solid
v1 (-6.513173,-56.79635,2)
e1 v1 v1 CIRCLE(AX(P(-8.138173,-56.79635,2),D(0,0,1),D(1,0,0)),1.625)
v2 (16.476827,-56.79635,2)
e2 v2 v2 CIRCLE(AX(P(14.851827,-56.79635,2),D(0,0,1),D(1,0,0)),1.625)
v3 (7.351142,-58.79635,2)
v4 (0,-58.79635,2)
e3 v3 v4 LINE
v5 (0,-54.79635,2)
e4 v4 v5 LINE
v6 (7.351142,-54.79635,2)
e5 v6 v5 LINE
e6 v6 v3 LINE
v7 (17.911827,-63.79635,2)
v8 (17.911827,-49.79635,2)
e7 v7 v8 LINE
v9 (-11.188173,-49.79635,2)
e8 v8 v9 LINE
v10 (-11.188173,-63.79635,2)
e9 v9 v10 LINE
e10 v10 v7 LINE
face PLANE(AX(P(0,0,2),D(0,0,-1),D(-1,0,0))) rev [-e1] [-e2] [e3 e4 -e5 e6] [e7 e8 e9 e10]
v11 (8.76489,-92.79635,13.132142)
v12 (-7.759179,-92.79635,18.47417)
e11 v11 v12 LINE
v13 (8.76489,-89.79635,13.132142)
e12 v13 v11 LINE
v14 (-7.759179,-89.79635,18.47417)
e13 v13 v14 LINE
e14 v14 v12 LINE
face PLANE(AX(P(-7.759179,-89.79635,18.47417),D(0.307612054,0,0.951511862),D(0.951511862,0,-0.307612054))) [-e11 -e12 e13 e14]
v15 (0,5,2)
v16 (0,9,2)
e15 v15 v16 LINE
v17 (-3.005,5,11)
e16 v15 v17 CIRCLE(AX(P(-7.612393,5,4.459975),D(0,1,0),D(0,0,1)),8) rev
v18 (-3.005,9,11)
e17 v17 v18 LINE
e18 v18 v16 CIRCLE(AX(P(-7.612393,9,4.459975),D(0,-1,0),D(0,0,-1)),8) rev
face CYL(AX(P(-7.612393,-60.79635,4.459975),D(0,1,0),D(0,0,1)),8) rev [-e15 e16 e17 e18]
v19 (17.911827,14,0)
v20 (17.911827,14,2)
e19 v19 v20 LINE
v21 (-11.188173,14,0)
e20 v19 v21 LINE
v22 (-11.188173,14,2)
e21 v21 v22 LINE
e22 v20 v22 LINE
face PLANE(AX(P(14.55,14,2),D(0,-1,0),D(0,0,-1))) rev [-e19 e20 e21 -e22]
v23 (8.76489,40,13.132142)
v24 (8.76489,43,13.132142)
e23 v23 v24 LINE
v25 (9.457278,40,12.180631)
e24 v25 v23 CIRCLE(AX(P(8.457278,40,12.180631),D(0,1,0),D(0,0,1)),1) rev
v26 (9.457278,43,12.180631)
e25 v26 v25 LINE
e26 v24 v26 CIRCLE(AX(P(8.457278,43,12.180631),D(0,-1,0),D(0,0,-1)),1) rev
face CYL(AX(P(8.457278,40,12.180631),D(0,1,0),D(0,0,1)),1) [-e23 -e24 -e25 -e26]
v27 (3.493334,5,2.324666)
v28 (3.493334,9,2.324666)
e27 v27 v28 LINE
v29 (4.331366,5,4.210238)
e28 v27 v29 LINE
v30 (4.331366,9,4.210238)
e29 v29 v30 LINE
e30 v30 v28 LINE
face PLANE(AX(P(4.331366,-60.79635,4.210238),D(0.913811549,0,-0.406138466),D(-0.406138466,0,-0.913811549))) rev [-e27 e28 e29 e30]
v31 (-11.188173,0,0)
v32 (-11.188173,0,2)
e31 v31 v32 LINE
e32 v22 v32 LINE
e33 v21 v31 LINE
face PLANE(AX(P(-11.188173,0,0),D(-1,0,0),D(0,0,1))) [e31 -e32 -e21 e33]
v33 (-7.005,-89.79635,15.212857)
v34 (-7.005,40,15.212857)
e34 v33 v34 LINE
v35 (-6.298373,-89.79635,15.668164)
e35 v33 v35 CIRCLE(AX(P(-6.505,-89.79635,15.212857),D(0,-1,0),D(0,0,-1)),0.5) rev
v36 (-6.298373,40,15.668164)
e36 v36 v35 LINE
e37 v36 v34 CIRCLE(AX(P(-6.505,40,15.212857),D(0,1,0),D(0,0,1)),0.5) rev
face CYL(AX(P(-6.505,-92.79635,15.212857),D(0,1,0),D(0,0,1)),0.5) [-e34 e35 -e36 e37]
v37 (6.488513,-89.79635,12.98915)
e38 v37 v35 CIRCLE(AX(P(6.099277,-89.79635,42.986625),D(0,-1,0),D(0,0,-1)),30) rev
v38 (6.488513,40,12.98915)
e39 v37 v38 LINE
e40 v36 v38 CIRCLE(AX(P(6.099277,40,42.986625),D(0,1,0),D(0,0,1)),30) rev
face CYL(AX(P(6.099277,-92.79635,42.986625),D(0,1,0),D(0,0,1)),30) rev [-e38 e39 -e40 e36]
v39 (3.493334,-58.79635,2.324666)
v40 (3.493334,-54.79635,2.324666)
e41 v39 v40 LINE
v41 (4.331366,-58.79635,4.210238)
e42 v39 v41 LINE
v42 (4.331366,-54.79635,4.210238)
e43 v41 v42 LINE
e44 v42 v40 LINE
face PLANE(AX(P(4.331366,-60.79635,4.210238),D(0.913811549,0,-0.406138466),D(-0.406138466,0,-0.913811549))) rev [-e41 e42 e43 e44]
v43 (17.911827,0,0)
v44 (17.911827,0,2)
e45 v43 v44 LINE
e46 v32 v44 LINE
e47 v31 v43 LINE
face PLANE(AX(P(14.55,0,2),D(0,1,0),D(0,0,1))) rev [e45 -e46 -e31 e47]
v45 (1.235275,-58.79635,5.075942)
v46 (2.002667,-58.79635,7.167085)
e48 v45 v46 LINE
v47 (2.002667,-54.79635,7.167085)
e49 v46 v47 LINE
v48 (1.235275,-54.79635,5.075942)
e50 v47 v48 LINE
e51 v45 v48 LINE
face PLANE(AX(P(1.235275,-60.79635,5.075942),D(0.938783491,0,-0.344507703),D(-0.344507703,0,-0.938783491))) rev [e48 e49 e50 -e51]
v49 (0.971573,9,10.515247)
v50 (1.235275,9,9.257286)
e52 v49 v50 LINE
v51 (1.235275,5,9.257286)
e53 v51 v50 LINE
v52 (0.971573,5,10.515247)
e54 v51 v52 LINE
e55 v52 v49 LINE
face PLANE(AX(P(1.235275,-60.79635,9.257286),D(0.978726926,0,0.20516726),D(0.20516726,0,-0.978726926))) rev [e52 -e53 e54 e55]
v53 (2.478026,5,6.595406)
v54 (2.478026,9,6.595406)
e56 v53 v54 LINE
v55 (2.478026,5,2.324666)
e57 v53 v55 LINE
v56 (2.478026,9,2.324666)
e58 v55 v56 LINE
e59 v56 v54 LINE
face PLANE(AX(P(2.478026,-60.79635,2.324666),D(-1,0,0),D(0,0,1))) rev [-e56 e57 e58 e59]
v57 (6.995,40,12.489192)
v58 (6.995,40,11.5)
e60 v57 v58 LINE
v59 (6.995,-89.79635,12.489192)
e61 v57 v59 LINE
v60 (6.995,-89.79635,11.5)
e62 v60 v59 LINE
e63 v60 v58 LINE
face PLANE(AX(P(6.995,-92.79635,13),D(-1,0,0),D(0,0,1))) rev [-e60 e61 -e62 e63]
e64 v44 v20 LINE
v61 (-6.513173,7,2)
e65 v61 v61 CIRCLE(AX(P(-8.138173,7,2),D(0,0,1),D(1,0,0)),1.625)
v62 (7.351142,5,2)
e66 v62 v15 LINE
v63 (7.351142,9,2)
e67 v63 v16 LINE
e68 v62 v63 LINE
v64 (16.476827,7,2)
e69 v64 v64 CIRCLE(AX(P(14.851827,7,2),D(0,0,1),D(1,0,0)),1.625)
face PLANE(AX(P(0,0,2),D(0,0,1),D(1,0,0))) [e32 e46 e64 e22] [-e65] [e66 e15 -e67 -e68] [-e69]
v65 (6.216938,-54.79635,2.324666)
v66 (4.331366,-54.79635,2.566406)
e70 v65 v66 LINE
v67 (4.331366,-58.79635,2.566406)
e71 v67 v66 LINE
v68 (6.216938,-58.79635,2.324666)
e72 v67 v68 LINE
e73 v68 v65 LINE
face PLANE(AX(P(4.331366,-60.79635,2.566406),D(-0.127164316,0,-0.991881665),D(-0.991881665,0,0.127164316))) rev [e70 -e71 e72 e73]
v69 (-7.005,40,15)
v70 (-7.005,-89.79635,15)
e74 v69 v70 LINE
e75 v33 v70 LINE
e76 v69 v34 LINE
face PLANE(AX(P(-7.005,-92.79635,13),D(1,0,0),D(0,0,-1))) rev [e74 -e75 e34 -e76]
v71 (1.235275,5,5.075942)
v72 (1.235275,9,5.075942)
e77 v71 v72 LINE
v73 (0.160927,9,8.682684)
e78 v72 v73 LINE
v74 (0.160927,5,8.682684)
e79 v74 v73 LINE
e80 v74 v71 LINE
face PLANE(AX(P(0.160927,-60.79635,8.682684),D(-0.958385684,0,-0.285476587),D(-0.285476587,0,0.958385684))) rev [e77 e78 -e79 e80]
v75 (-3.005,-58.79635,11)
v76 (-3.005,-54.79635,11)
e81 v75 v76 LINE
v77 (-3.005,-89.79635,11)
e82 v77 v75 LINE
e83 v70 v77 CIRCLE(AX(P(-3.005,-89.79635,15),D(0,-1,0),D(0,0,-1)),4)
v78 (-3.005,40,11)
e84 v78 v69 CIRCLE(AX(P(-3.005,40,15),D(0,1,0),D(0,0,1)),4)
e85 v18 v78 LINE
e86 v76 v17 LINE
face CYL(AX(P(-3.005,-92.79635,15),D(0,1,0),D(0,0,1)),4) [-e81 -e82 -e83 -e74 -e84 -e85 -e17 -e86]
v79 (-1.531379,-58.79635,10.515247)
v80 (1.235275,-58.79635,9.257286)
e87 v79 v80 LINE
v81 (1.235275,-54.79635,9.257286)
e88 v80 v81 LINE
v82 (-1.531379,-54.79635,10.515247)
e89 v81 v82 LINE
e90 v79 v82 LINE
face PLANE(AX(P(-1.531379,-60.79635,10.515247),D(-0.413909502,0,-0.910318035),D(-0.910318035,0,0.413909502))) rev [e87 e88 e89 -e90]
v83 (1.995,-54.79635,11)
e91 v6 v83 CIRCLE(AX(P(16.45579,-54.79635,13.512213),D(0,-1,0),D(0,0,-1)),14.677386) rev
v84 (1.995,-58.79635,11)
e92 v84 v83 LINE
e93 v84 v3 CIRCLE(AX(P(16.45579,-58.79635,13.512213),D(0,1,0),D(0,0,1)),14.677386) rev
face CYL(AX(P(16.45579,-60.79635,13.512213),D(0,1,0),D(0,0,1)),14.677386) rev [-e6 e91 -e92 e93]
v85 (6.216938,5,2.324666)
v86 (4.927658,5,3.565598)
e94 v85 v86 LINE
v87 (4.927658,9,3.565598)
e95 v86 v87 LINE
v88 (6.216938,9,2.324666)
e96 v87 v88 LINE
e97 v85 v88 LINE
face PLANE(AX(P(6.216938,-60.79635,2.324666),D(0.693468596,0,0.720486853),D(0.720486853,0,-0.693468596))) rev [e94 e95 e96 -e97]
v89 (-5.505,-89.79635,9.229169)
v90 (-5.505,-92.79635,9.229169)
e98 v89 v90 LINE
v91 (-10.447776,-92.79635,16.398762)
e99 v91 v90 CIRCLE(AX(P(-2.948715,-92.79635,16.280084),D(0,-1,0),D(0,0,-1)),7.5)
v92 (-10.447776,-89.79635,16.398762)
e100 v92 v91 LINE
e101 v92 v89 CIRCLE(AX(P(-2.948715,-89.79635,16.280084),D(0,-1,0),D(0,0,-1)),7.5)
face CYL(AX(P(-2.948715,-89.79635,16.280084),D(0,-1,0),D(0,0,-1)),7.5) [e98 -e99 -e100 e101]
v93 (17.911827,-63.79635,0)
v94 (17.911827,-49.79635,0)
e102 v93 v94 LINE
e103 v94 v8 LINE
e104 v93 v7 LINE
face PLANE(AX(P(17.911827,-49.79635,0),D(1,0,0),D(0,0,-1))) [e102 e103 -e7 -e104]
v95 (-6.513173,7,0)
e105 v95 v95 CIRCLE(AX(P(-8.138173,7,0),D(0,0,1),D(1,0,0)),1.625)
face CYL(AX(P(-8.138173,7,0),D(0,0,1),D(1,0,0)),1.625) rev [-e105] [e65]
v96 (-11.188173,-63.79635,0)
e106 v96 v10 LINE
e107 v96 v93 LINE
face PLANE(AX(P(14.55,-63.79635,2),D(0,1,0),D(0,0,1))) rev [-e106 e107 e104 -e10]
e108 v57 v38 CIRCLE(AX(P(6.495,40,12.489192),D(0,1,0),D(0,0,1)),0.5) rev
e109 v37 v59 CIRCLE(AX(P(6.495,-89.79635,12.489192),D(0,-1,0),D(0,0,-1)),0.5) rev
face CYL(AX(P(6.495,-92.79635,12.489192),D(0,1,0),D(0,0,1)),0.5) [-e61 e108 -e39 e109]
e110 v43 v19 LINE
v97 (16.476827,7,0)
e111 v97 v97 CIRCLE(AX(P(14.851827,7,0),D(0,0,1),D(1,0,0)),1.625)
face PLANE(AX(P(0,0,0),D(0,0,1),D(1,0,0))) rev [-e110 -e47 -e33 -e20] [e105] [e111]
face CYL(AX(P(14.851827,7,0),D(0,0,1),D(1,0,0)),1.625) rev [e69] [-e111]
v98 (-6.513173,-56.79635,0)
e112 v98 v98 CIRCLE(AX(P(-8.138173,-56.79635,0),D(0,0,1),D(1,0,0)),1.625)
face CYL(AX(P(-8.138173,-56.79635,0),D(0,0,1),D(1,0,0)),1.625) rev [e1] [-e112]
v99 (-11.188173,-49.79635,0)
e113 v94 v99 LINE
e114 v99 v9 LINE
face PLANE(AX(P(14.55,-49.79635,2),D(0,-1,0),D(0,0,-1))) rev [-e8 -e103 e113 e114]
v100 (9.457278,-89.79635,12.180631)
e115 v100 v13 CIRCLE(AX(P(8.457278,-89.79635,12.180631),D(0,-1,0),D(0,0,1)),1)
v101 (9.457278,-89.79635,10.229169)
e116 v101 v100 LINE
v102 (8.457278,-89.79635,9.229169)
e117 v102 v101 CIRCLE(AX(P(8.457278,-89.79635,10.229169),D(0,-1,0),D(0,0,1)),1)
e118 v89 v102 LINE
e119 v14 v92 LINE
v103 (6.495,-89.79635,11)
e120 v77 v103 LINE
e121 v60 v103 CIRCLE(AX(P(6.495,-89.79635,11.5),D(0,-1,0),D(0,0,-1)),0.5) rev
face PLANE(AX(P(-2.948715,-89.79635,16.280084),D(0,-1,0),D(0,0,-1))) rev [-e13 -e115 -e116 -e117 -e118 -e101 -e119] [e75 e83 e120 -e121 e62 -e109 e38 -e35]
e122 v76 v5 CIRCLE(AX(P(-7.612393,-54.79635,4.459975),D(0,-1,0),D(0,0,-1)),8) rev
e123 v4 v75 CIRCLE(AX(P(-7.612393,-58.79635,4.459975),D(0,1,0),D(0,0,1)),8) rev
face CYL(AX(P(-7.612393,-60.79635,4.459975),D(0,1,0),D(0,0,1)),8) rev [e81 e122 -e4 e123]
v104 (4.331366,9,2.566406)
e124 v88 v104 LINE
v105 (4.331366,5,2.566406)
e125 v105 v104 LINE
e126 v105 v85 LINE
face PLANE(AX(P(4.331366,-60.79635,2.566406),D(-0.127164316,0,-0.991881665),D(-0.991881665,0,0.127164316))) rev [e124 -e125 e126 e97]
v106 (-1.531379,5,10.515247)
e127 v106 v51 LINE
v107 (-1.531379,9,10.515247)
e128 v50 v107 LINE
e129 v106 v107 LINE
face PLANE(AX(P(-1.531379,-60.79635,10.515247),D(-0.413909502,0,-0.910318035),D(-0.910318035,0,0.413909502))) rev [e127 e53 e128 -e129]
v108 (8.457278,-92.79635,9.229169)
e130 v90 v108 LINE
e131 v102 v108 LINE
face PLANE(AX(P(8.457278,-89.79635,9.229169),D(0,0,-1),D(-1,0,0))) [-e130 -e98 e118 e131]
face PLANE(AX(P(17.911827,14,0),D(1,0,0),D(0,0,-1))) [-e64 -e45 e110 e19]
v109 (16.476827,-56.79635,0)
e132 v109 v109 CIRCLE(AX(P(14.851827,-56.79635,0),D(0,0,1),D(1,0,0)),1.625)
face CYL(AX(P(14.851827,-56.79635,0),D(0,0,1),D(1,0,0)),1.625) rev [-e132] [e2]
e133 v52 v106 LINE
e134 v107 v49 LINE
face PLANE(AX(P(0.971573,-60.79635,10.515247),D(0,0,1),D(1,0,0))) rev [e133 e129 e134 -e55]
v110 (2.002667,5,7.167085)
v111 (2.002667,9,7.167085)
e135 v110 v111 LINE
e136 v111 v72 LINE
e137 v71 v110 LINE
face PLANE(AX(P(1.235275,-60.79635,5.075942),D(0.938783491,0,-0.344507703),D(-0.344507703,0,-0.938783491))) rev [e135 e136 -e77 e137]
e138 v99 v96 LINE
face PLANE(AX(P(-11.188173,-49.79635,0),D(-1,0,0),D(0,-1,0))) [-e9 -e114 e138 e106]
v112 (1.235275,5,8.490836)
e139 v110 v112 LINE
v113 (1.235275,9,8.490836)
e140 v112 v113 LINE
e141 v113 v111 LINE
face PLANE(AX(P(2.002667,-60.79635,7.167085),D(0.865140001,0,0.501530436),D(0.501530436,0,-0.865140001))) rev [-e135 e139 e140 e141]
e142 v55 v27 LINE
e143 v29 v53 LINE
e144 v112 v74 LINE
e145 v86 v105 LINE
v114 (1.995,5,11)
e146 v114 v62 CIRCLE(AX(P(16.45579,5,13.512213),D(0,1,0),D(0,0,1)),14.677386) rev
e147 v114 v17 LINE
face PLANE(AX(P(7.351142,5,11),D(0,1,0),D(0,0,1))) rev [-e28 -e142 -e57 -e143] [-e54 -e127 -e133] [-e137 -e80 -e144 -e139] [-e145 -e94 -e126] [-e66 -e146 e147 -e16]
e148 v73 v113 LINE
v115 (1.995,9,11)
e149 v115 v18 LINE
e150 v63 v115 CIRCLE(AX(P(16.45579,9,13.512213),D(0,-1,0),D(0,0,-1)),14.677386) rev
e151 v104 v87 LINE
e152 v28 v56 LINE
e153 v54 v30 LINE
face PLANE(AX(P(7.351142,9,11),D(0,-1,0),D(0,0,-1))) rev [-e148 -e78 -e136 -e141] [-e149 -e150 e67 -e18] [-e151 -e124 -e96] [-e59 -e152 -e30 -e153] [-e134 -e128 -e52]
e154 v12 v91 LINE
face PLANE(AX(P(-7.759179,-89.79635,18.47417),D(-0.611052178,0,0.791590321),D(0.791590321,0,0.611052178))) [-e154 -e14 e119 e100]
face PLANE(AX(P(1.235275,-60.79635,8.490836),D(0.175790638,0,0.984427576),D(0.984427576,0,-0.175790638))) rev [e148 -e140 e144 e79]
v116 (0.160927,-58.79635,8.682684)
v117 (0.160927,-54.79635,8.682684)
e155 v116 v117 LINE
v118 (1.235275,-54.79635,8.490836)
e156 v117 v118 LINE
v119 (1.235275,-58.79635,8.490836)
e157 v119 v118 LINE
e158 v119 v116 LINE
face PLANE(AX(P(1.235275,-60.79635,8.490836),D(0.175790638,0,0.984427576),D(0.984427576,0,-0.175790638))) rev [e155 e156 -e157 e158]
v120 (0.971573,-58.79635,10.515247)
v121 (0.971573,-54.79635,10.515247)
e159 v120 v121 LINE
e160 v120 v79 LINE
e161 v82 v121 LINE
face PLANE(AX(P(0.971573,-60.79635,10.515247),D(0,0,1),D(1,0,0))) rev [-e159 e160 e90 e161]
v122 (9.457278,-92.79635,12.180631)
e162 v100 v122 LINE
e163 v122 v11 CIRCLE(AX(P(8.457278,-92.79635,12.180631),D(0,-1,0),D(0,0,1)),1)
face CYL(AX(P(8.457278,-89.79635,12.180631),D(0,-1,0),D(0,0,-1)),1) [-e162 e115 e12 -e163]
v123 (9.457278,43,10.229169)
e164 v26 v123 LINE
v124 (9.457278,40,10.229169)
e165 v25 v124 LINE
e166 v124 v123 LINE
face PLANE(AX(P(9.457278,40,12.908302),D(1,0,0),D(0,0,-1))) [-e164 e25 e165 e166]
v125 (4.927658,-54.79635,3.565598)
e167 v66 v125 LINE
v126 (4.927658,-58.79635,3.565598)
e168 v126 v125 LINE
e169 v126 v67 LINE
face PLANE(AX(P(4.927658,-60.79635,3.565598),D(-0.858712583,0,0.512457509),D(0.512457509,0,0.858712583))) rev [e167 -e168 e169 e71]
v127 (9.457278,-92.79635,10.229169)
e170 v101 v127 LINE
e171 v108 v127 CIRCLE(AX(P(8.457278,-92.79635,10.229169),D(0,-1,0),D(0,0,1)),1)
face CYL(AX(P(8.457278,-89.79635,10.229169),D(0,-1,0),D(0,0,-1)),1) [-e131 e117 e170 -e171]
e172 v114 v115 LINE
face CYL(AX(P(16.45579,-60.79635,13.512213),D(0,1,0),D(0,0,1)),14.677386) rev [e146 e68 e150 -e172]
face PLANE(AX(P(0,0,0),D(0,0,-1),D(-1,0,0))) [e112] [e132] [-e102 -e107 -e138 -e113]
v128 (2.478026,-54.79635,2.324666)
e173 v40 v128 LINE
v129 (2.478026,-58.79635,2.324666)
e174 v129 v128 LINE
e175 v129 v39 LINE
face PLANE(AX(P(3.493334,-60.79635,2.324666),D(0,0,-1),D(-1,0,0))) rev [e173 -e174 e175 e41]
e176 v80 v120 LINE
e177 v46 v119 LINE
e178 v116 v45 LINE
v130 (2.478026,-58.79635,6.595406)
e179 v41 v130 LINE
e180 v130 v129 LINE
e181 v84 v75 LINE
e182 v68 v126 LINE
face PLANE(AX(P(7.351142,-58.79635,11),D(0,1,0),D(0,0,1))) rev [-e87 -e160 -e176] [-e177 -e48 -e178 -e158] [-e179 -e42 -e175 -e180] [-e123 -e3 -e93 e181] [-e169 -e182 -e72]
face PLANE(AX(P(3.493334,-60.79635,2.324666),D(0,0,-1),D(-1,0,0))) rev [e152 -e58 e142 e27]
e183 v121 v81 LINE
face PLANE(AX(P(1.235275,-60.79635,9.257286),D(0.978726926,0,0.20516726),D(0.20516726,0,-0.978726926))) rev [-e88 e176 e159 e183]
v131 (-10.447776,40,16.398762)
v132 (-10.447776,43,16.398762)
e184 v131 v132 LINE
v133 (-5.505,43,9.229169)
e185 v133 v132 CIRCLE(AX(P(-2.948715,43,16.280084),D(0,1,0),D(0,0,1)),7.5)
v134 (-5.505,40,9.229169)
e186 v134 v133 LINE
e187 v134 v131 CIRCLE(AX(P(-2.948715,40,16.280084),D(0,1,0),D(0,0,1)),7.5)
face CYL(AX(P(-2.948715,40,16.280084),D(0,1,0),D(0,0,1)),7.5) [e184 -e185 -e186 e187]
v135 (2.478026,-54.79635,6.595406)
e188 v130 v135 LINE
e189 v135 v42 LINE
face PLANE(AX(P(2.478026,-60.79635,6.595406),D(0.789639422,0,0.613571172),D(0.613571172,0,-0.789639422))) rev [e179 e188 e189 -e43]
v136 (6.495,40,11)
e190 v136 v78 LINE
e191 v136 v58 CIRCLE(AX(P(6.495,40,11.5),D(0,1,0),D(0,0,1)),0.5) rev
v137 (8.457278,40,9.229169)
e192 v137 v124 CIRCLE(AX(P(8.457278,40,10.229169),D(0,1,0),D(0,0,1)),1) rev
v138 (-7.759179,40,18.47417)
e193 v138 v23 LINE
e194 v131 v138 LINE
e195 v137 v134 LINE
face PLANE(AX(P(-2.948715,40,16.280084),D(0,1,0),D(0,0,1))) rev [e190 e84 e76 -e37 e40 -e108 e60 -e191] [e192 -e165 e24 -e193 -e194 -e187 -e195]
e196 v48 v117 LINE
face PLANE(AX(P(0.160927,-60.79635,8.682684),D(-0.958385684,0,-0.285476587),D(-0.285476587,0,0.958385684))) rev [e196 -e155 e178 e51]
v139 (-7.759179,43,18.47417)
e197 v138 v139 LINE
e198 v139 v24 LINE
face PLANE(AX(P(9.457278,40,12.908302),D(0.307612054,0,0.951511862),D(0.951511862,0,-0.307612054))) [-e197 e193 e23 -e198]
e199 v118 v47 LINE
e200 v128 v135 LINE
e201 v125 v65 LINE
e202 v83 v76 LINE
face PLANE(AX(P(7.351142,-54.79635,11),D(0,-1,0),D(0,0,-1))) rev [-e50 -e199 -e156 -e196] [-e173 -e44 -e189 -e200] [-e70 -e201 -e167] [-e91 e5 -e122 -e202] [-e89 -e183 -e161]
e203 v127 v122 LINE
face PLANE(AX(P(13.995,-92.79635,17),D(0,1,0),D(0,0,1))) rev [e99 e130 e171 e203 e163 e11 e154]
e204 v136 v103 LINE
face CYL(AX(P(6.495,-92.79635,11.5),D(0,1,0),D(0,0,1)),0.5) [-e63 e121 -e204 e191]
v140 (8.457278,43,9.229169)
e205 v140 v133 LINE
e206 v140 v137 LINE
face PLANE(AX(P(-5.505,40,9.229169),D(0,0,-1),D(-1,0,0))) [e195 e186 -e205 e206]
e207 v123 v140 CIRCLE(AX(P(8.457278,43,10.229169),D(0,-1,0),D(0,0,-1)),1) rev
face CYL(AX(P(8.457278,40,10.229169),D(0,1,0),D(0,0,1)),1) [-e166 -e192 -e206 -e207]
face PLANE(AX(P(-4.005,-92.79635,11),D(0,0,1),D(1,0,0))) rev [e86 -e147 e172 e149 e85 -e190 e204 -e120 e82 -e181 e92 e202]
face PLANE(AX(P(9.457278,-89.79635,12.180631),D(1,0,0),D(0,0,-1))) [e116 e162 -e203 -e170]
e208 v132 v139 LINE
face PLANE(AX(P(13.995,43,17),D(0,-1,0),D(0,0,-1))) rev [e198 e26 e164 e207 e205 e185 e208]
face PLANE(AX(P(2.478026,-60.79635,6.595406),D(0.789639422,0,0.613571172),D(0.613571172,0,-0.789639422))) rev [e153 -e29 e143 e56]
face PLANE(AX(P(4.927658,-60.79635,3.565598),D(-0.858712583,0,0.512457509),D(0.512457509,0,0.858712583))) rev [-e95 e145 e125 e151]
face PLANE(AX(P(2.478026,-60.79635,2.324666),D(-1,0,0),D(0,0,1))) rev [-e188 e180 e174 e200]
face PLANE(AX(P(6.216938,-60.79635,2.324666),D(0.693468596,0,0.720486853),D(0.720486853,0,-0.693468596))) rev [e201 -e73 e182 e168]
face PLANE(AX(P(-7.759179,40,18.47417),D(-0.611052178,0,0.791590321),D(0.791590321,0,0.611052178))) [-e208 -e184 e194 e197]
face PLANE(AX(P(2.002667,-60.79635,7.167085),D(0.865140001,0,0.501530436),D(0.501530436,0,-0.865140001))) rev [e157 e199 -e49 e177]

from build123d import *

# Parameters (mm, degrees)
CROQUIS1_W                = 29.1
CROQUIS1_H                = 14
CROQUIS1_R                = 1.625
SALIENTE_EXTRUIR1_DEPTH   = 2
SALIENTE_EXTRUIR1_2_DEPTH = 2
CROQUIS2_W                = 8
CROQUIS2_H                = 8
SALIENTE_EXTRUIR2_DEPTH   = 7
CROQUIS3_W                = 28
CROQUIS3_H                = 135.79635
SALIENTE_EXTRUIR3_DEPTH   = 8
CORTAR_EXTRUIR1_START     = -135.79635
CORTAR_EXTRUIR1_DEPTH     = 135.79635
REDONDEO1_R               = 0.5
REDONDEO2_R               = 0.5
CROQUIS5_W                = 2
CROQUIS5_H                = 32
CROQUIS5_H_2              = 55.79635
CORTAR_EXTRUIR2_DEPTH     = 8
SALIENTE_EXTRUIR4_DEPTH   = 3
REDONDEO4_R               = 1
SALIENTE_EXTRUIR5_DEPTH   = 3
CORTAR_EXTRUIR4_START     = -71.79635
CORTAR_EXTRUIR4_DEPTH     = 71.79635
SALIENTE_EXTRUIR7_START   = -8
SALIENTE_EXTRUIR7_DEPTH   = 8
SALIENTE_EXTRUIR8_START   = -8
SALIENTE_EXTRUIR8_DEPTH   = 8
CORTAR_EXTRUIR5_START     = -71.79635
CORTAR_EXTRUIR5_DEPTH     = 71.79635
REDONDEO5_R               = 4
CORTAR_EXTRUIR6_START     = -21.901142
CROQUIS15_W               = 9
CROQUIS15_H               = 2
CORTAR_EXTRUIR6_DEPTH     = 14.356142
CORTAR_EXTRUIR7_START     = -103.79635
CROQUIS16_W               = 5.770605939
CROQUIS16_H               = 2
CROQUIS16_W_2             = 12.752116736
CORTAR_EXTRUIR7_DEPTH     = 129.79635
CROQUIS17_W               = 9.132432918
CROQUIS17_H               = 14
CROQUIS17_R               = 1.625
CROQUIS17_W_2             = 9.390289757
SALIENTE_EXTRUIR9_DEPTH   = 2


with BuildPart() as part:
    # Croquis1 → Saliente-Extruir1 (new body)
    with BuildSketch(Plane.XY):
        with Locations((0, -56.79635)):
            Rectangle(CROQUIS1_W, CROQUIS1_H)
        with Locations((11.49, -56.79635)):
            Circle(CROQUIS1_R, mode=Mode.SUBTRACT)
        with Locations((-11.5, -56.79635)):
            Circle(CROQUIS1_R, mode=Mode.SUBTRACT)
    extrude(amount=SALIENTE_EXTRUIR1_DEPTH)



with BuildPart() as body_2:
    # Croquis1 → Saliente-Extruir1 2 (new body)
    with BuildSketch(Plane.XY):
        with Locations((0, 7)):
            Rectangle(CROQUIS1_W, CROQUIS1_H)
        with Locations((-11.5, 7)):
            Circle(CROQUIS1_R, mode=Mode.SUBTRACT)
        with Locations((11.49, 7)):
            Circle(CROQUIS1_R, mode=Mode.SUBTRACT)
    extrude(amount=SALIENTE_EXTRUIR1_2_DEPTH)


with BuildPart() as part_1:
    add(part.part)

    add(body_2.part)  # Saliente-Extruir2 merges body 2
    # Croquis2 → Saliente-Extruir2 (add)
    with BuildSketch(Plane.XY.offset(2)):
        with Locations((-0.005, 7)):
            Rectangle(CROQUIS2_W, CROQUIS2_H)
        with Locations((-0.005, -56.79635)):
            Rectangle(CROQUIS2_W, CROQUIS2_H)
    extrude(amount=SALIENTE_EXTRUIR2_DEPTH)

    # Croquis3 → Saliente-Extruir3 (add)
    with BuildSketch(Plane.XY.offset(9)):
        with Locations((-0.005, -24.898175)):
            Rectangle(CROQUIS3_W, CROQUIS3_H)
    extrude(amount=SALIENTE_EXTRUIR3_DEPTH)

    # Croquis4 → Cortar-Extruir1 (cut)
    with BuildSketch(Plane(origin=(0, 43, 0), x_dir=(1, 0, 0), z_dir=(0, 1, 0)).offset(CORTAR_EXTRUIR1_START)):
        with BuildLine():
            Line((3.995, -9), (3.995, -11))
            Line((3.995, -11), (6.995, -11))
            Line((6.995, -11), (6.995, -13))
            ThreePointArc((6.995, -13), (-0.186595872, -13.652552595), (-7.005, -16))
            Line((-7.005, -16), (-7.005, -13))
            Line((-7.005, -13), (-7.005, -11))
            Line((-7.005, -11), (-4.005, -11))
            Line((-4.005, -11), (-4.005, -9))
            Line((-4.005, -9), (-14.005, -9))
            Line((-14.005, -9), (-14.005, -17))
            Line((-14.005, -17), (13.995, -17))
            Line((13.995, -17), (13.995, -9))
            Line((13.995, -9), (3.995, -9))
        make_face()
    extrude(amount=CORTAR_EXTRUIR1_DEPTH, mode=Mode.SUBTRACT)

    # Redondeo1
    redondeo1_edges = [part_1.edges().sort_by_distance(p)[0] for p in [
        (6.995, -24.898175, 13),
        (6.995, -24.898175, 11),
    ]]
    fillet(redondeo1_edges, radius=REDONDEO1_R)

    # Redondeo2
    redondeo2_edges = [part_1.edges().sort_by_distance(p)[0] for p in [
        (-7.005, -24.898175, 16),
    ]]
    fillet(redondeo2_edges, radius=REDONDEO2_R)

    # Croquis5 → Cortar-Extruir2 (cut)
    with BuildSketch(Plane.ZY.offset(4.005)):
        with Locations((10, 27)):
            Rectangle(CROQUIS5_W, CROQUIS5_H)
        with Locations((10, -24.898175)):
            Rectangle(CROQUIS5_W, CROQUIS5_H_2)
        with Locations((10, -76.79635)):
            Rectangle(CROQUIS5_W, CROQUIS5_H)
    extrude(amount=-CORTAR_EXTRUIR2_DEPTH, mode=Mode.SUBTRACT)

    # Croquis6 → Saliente-Extruir4 (add)
    with BuildSketch(Plane(origin=(0, 43, 0), x_dir=(1, 0, 0), z_dir=(0, 1, 0))):
        with BuildLine():
            Line((9.457278185, -12.908301876), (-7.759178779, -18.474170155))
            Line((-7.759178779, -18.474170155), (-10.447776168, -16.398761645))
            ThreePointArc((-10.447776168, -16.398761645), (-9.123523754, -12.023120399), (-5.505, -9.229168607))
            Line((-5.505, -9.229168607), (9.457278185, -9.229168607))
            Line((9.457278185, -9.229168607), (9.457278185, -12.908301876))
        make_face()
    extrude(amount=-SALIENTE_EXTRUIR4_DEPTH)

    # Redondeo4
    redondeo4_edges = [part_1.edges().sort_by_distance(p)[0] for p in [
        (9.457278185, 41.5, 9.229168607),
        (9.457278185, 41.5, 12.908301876),
    ]]
    fillet(redondeo4_edges, radius=REDONDEO4_R)

    # Croquis7 → Saliente-Extruir5 (add)
    with BuildSketch(Plane.XZ.offset(92.79635)):
        with BuildLine():
            Line((-7.759178779, 18.474170155), (8.76489024, 13.132142363))
            ThreePointArc((8.76489024, 13.132142363), (9.265860913, 12.769013006), (9.457278185, 12.180630501))
            Line((9.457278185, 12.180630501), (9.457278185, 10.229168607))
            ThreePointArc((9.457278185, 10.229168607), (9.164384967, 9.522061826), (8.457278185, 9.229168607))
            Line((8.457278185, 9.229168607), (-5.505, 9.229168607))
            ThreePointArc((-5.505, 9.229168607), (-9.123523754, 12.023120399), (-10.447776168, 16.398761645))
            Line((-10.447776168, 16.398761645), (-7.759178779, 18.474170155))
        make_face()
    extrude(amount=-SALIENTE_EXTRUIR5_DEPTH)

    # Croquis11 → Cortar-Extruir4 (cut)
    with BuildSketch(Plane(origin=(0, 11, 0), x_dir=(1, 0, 0), z_dir=(0, 1, 0)).offset(CORTAR_EXTRUIR4_START)):
        with BuildLine():
            Line((-4.005, -11), (-3.005, -11))
            ThreePointArc((-3.005, -11), (-0.024192095, -6.993590584), (0, -2))
            Line((0, -2), (-4.005, -2))
            Line((-4.005, -2), (-4.005, -11))
        make_face()
        with BuildLine():
            Line((3.995, -11), (1.995, -11))
            ThreePointArc((1.995, -11), (2.742037907, -8.281661906), (3.995, -5.756287949))
            Line((3.995, -5.756287949), (3.995, -11))
        make_face()
    extrude(amount=CORTAR_EXTRUIR4_DEPTH, mode=Mode.SUBTRACT)

    # Croquis12 → Saliente-Extruir7 (add)
    with BuildSketch(Plane(origin=(0, 11, 0), x_dir=(1, 0, 0), z_dir=(0, 1, 0)).offset(SALIENTE_EXTRUIR7_START)):
        with BuildLine():
            Line((3.995, -2), (7.351142184, -2))
            ThreePointArc((7.351142184, -2), (5.510724817, -3.733091947), (3.995, -5.756287949))
            Line((3.995, -5.756287949), (3.995, -2))
        make_face()
    extrude(amount=SALIENTE_EXTRUIR7_DEPTH)

    # Croquis13 → Saliente-Extruir8 (add)
    with BuildSketch(Plane.XZ.offset(60.79635).offset(SALIENTE_EXTRUIR8_START)):
        with BuildLine():
            Line((3.995, 5.756287949), (3.995, 2))
            Line((3.995, 2), (7.351142184, 2))
            ThreePointArc((7.351142184, 2), (5.510724817, 3.733091947), (3.995, 5.756287949))
        make_face()
    extrude(amount=SALIENTE_EXTRUIR8_DEPTH)

    # Croquis14 → Cortar-Extruir5 (cut)
    with BuildSketch(Plane(origin=(0, 11, 0), x_dir=(1, 0, 0), z_dir=(0, 1, 0)).offset(CORTAR_EXTRUIR5_START)):
        Polygon((6.21693803, -2.324666095), (4.927658189, -3.565597942), (4.331366262, -2.566406065), align=None)
        Polygon((3.493334365, -2.324666095), (2.47802649, -2.324666095), (2.47802649, -6.595405569), (4.331366262, -4.210237863), align=None)
        Polygon((1.235275319, -5.075942388), (2.002667058, -7.167084876), (1.235275319, -8.490835625), (0.160926885, -8.68268356), align=None)
        Polygon((0.97157316, -10.515246809), (-1.531379092, -10.515246809), (1.235275319, -9.257285848), align=None)
    extrude(amount=CORTAR_EXTRUIR5_DEPTH, mode=Mode.SUBTRACT)

    # Redondeo5
    redondeo5_edges = [part_1.edges().sort_by_distance(p)[0] for p in [
        (-7.005, -24.898175, 11),
    ]]
    fillet(redondeo5_edges, radius=REDONDEO5_R - 0.0001)  # a hair under: the kernel refuses the full size

    # Croquis15 → Cortar-Extruir6 (cut)
    with BuildSketch(Plane.ZY.offset(14.55).offset(CORTAR_EXTRUIR6_START)):
        with Locations((6.5, 10)):
            Rectangle(CROQUIS15_W, CROQUIS15_H)
        with Locations((6.5, 4)):
            Rectangle(CROQUIS15_W, CROQUIS15_H)
        with Locations((6.5, -53.79635)):
            Rectangle(CROQUIS15_W, CROQUIS15_H)
        with Locations((6.5, -59.79635)):
            Rectangle(CROQUIS15_W, CROQUIS15_H)
    extrude(amount=CORTAR_EXTRUIR6_DEPTH, mode=Mode.SUBTRACT)

    # Croquis16 → Cortar-Extruir7 (cut)
    with BuildSketch(Plane(origin=(0, 14, 0), x_dir=(1, 0, 0), z_dir=(0, 1, 0)).offset(CORTAR_EXTRUIR7_START)):
        with Locations((11.664697031, -1)):
            Rectangle(CROQUIS16_W, CROQUIS16_H)
        with Locations((-8.173941632, -1)):
            Rectangle(CROQUIS16_W_2, CROQUIS16_H)
    extrude(amount=CORTAR_EXTRUIR7_DEPTH, mode=Mode.SUBTRACT)

    # Croquis17 → Saliente-Extruir9 (add)
    # profile 1 of 4: a face of its own
    with BuildSketch(Plane.XY.offset(2)):
        with Locations((13.34561052, 7)):
            Rectangle(CROQUIS17_W, CROQUIS17_H)
        with Locations((14.851826979, 7)):
            Circle(CROQUIS17_R, mode=Mode.SUBTRACT)
    # profile 2 of 4: a face of its own
    with BuildSketch(Plane.XY.offset(2)):
        with Locations((-6.493028143, 7)):
            Rectangle(CROQUIS17_W_2, CROQUIS17_H)
        with Locations((-8.138173021, 7)):
            Circle(CROQUIS17_R, mode=Mode.SUBTRACT)
    # profile 3 of 4: a face of its own
    with BuildSketch(Plane.XY.offset(2)):
        with Locations((-6.493028143, -56.79635)):
            Rectangle(CROQUIS17_W_2, CROQUIS17_H)
        with Locations((-8.138173021, -56.79635)):
            Circle(CROQUIS17_R, mode=Mode.SUBTRACT)
    # profile 4 of 4: a face of its own
    with BuildSketch(Plane.XY.offset(2)):
        with Locations((13.34561052, -56.79635)):
            Rectangle(CROQUIS17_W, CROQUIS17_H)
        with Locations((14.851826979, -56.79635)):
            Circle(CROQUIS17_R, mode=Mode.SUBTRACT)
    extrude(amount=-SALIENTE_EXTRUIR9_DEPTH)


solid = part_1.part
